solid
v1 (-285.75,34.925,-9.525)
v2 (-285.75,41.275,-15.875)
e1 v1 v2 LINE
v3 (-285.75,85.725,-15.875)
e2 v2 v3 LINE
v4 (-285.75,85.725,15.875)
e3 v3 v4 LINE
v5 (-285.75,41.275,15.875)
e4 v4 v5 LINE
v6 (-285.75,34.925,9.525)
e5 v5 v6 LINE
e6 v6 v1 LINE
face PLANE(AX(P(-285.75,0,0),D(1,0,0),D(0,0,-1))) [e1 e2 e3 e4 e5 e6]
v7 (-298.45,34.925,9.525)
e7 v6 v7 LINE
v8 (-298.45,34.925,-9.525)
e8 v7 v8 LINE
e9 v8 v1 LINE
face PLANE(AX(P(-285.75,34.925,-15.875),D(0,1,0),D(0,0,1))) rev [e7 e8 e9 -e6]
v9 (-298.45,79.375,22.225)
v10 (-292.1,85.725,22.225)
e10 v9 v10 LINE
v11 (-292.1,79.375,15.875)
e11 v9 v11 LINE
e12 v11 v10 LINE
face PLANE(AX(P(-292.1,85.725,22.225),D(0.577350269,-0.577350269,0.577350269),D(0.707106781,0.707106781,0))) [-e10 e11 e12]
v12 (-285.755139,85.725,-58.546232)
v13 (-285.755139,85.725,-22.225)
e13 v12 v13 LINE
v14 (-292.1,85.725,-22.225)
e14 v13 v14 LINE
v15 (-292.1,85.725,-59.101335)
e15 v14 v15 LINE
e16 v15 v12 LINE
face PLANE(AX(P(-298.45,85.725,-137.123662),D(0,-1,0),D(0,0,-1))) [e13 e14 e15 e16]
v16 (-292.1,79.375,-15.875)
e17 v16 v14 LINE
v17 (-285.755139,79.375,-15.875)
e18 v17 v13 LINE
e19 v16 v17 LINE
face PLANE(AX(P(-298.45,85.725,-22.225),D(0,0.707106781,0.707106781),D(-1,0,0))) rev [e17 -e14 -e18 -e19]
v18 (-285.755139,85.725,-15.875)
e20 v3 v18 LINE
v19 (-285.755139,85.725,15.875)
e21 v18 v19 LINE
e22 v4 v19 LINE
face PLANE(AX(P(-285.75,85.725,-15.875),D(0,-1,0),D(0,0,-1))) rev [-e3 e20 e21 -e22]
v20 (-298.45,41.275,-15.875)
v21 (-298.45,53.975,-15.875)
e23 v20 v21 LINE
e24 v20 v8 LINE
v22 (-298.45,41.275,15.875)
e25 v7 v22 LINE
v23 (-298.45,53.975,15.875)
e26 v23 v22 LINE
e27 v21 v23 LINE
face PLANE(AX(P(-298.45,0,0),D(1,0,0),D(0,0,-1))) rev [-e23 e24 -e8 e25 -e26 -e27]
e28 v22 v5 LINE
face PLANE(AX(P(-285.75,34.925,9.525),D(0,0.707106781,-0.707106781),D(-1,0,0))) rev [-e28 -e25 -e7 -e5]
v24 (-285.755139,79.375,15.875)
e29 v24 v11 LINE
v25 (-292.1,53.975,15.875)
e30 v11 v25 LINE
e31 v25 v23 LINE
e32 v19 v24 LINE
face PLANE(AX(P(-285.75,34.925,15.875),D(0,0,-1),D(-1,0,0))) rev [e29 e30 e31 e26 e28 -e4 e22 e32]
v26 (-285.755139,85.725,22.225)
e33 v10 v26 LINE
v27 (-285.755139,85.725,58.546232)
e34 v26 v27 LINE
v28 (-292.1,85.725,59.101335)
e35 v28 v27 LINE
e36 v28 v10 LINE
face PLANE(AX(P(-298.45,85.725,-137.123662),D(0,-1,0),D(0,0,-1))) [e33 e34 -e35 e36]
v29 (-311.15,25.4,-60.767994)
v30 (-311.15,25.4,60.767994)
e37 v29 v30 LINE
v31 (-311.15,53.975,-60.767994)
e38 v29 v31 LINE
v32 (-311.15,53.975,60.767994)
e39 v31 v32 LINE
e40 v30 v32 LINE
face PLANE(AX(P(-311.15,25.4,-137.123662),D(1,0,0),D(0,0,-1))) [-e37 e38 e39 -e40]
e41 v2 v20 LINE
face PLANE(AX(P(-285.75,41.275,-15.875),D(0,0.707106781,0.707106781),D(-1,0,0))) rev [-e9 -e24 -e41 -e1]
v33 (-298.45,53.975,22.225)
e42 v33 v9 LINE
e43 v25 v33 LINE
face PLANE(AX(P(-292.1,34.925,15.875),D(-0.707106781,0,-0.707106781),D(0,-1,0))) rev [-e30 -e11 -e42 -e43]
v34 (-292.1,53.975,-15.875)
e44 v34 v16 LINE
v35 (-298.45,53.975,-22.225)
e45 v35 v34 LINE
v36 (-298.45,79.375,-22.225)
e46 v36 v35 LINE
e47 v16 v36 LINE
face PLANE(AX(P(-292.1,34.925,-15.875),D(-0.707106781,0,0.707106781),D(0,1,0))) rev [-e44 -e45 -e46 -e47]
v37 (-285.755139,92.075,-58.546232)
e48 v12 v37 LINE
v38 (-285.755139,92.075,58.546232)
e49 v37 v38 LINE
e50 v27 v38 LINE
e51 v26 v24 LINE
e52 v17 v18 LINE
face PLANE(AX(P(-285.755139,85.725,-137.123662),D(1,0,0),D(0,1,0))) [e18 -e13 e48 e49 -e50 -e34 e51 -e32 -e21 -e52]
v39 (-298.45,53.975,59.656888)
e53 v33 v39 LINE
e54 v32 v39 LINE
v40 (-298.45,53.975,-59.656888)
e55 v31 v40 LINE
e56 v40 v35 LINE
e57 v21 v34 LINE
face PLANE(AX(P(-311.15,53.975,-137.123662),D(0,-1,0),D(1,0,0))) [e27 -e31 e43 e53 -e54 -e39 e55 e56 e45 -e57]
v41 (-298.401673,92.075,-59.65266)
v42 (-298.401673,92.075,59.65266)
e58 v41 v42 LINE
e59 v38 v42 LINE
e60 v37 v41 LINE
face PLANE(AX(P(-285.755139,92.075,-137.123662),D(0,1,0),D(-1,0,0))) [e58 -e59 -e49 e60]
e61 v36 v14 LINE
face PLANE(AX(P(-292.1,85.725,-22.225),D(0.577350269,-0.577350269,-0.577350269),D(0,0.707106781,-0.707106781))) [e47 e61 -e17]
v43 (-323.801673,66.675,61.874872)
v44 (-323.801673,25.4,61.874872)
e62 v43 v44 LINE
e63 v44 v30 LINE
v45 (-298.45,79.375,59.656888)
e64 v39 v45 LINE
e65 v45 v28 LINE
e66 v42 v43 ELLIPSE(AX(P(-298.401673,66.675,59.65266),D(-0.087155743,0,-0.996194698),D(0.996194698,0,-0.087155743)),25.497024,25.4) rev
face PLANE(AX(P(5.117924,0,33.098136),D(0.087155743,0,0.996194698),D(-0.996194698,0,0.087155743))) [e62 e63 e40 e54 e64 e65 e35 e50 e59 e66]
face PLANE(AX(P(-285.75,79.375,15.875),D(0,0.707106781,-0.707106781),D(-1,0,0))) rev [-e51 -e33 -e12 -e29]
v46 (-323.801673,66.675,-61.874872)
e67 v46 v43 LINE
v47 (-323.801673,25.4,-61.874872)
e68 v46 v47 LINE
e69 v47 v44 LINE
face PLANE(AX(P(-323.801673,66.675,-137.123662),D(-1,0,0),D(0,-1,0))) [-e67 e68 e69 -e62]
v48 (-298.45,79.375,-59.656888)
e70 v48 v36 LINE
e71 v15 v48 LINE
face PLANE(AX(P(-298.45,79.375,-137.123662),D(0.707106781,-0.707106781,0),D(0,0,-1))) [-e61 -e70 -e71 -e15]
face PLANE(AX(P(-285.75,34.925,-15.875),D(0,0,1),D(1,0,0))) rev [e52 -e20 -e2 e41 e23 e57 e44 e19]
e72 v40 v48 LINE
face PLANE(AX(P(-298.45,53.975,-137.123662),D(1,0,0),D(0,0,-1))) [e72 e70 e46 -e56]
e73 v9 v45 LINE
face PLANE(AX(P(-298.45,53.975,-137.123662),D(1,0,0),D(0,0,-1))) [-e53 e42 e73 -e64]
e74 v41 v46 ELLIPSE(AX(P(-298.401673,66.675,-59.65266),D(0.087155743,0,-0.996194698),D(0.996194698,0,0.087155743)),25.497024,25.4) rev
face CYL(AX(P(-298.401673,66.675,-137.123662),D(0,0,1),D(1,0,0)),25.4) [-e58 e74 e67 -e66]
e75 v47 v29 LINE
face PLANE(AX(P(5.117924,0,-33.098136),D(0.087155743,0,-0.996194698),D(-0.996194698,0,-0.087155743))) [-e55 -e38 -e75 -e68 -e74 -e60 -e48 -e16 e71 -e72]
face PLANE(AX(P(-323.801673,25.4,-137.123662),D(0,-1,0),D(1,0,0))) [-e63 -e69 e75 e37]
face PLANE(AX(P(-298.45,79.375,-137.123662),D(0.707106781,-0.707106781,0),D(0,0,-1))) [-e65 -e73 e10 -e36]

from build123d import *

# Parameters (mm, degrees)
BOSS_EXTRUDE1_START       = -61.874871948
BOSS_EXTRUDE1_DEPTH       = 61.874871948
BOSS_EXTRUDE1_START_2     = 33.418244096
BOSS_EXTRUDE1_2_OUTLINE_W = 41
BOSS_EXTRUDE1_2_OUTLINE_H = 70
BOSS_EXTRUDE1_2_DEPTH     = 4.581755904
SKETCH2_W                 = 31.75
SKETCH2_H                 = 50.8
BOSS_EXTRUDE2_DEPTH       = 12.7
CHAMFER1_SIZE             = 6.35


with BuildPart() as part:
    # Boss-Extrude1: read off the stored shape, not the designer's step
    # Boss-Extrude1 outline → Boss-Extrude1 (new body)
    with BuildSketch(Plane.XY.offset(BOSS_EXTRUDE1_START)):
        with BuildLine():
            Line((-285.755139406, 85.725), (-285.755139406, 92.075))
            Line((-285.755139406, 92.075), (-298.401672666, 92.075))
            ThreePointArc((-298.401672666, 92.075), (-316.362184908, 84.635512242), (-323.801672666, 66.675))
            Line((-323.801672666, 66.675), (-323.801672666, 25.4))
            Line((-323.801672666, 25.4), (-311.15, 25.4))
            Line((-311.15, 25.4), (-311.15, 53.975))
            Line((-311.15, 53.975), (-298.45, 53.975))
            Line((-298.45, 53.975), (-298.45, 85.725))
            Line((-298.45, 85.725), (-285.755139406, 85.725))
        make_face()
    boss_extrude1 = extrude(amount=BOSS_EXTRUDE1_DEPTH)

    # Boss-Extrude1 2 outline → Boss-Extrude1 2 (cut)
    with BuildSketch(Plane(origin=(0, 0, 0), x_dir=(0.9961946980917459, 0, 0.08715574274765299), z_dir=(0.087155742747653, 0, -0.996194698091746)).offset(BOSS_EXTRUDE1_START_2)):
        with Locations((-308.5, -59)):
            Rectangle(BOSS_EXTRUDE1_2_OUTLINE_W, BOSS_EXTRUDE1_2_OUTLINE_H)
    boss_extrude1_2 = extrude(amount=BOSS_EXTRUDE1_2_DEPTH, mode=Mode.SUBTRACT)

    # Mirror1: Boss-Extrude1, Boss-Extrude1 2 across plane
    add(boss_extrude1.mirror(Plane.XY))
    add(boss_extrude1_2.mirror(Plane.XY), mode=Mode.SUBTRACT)

    # Sketch2 → Boss-Extrude2 (add)
    with BuildSketch(Plane(origin=(-298.45, 0, 0), x_dir=(0, 0, -1), z_dir=(1, 0, 0))):
        with Locations((0, 60.325)):
            Rectangle(SKETCH2_W, SKETCH2_H)
    extrude(amount=BOSS_EXTRUDE2_DEPTH)

    # Chamfer1
    chamfer1_edges = [part.edges().sort_by_distance(p)[0] for p in [
        (-292.1, 34.925, -15.875),
        (-292.1, 34.925, 15.875),
        (-292.102569703, 85.725, -15.875),
        (-298.45, 85.725, -37.765943994),
        (-298.45, 69.85, -15.875),
        (-298.45, 85.725, 37.765943994),
        (-292.102569703, 85.725, 15.875),
        (-298.45, 69.85, 15.875),
    ]]
    chamfer(chamfer1_edges, length=CHAMFER1_SIZE)


solid = part.part
